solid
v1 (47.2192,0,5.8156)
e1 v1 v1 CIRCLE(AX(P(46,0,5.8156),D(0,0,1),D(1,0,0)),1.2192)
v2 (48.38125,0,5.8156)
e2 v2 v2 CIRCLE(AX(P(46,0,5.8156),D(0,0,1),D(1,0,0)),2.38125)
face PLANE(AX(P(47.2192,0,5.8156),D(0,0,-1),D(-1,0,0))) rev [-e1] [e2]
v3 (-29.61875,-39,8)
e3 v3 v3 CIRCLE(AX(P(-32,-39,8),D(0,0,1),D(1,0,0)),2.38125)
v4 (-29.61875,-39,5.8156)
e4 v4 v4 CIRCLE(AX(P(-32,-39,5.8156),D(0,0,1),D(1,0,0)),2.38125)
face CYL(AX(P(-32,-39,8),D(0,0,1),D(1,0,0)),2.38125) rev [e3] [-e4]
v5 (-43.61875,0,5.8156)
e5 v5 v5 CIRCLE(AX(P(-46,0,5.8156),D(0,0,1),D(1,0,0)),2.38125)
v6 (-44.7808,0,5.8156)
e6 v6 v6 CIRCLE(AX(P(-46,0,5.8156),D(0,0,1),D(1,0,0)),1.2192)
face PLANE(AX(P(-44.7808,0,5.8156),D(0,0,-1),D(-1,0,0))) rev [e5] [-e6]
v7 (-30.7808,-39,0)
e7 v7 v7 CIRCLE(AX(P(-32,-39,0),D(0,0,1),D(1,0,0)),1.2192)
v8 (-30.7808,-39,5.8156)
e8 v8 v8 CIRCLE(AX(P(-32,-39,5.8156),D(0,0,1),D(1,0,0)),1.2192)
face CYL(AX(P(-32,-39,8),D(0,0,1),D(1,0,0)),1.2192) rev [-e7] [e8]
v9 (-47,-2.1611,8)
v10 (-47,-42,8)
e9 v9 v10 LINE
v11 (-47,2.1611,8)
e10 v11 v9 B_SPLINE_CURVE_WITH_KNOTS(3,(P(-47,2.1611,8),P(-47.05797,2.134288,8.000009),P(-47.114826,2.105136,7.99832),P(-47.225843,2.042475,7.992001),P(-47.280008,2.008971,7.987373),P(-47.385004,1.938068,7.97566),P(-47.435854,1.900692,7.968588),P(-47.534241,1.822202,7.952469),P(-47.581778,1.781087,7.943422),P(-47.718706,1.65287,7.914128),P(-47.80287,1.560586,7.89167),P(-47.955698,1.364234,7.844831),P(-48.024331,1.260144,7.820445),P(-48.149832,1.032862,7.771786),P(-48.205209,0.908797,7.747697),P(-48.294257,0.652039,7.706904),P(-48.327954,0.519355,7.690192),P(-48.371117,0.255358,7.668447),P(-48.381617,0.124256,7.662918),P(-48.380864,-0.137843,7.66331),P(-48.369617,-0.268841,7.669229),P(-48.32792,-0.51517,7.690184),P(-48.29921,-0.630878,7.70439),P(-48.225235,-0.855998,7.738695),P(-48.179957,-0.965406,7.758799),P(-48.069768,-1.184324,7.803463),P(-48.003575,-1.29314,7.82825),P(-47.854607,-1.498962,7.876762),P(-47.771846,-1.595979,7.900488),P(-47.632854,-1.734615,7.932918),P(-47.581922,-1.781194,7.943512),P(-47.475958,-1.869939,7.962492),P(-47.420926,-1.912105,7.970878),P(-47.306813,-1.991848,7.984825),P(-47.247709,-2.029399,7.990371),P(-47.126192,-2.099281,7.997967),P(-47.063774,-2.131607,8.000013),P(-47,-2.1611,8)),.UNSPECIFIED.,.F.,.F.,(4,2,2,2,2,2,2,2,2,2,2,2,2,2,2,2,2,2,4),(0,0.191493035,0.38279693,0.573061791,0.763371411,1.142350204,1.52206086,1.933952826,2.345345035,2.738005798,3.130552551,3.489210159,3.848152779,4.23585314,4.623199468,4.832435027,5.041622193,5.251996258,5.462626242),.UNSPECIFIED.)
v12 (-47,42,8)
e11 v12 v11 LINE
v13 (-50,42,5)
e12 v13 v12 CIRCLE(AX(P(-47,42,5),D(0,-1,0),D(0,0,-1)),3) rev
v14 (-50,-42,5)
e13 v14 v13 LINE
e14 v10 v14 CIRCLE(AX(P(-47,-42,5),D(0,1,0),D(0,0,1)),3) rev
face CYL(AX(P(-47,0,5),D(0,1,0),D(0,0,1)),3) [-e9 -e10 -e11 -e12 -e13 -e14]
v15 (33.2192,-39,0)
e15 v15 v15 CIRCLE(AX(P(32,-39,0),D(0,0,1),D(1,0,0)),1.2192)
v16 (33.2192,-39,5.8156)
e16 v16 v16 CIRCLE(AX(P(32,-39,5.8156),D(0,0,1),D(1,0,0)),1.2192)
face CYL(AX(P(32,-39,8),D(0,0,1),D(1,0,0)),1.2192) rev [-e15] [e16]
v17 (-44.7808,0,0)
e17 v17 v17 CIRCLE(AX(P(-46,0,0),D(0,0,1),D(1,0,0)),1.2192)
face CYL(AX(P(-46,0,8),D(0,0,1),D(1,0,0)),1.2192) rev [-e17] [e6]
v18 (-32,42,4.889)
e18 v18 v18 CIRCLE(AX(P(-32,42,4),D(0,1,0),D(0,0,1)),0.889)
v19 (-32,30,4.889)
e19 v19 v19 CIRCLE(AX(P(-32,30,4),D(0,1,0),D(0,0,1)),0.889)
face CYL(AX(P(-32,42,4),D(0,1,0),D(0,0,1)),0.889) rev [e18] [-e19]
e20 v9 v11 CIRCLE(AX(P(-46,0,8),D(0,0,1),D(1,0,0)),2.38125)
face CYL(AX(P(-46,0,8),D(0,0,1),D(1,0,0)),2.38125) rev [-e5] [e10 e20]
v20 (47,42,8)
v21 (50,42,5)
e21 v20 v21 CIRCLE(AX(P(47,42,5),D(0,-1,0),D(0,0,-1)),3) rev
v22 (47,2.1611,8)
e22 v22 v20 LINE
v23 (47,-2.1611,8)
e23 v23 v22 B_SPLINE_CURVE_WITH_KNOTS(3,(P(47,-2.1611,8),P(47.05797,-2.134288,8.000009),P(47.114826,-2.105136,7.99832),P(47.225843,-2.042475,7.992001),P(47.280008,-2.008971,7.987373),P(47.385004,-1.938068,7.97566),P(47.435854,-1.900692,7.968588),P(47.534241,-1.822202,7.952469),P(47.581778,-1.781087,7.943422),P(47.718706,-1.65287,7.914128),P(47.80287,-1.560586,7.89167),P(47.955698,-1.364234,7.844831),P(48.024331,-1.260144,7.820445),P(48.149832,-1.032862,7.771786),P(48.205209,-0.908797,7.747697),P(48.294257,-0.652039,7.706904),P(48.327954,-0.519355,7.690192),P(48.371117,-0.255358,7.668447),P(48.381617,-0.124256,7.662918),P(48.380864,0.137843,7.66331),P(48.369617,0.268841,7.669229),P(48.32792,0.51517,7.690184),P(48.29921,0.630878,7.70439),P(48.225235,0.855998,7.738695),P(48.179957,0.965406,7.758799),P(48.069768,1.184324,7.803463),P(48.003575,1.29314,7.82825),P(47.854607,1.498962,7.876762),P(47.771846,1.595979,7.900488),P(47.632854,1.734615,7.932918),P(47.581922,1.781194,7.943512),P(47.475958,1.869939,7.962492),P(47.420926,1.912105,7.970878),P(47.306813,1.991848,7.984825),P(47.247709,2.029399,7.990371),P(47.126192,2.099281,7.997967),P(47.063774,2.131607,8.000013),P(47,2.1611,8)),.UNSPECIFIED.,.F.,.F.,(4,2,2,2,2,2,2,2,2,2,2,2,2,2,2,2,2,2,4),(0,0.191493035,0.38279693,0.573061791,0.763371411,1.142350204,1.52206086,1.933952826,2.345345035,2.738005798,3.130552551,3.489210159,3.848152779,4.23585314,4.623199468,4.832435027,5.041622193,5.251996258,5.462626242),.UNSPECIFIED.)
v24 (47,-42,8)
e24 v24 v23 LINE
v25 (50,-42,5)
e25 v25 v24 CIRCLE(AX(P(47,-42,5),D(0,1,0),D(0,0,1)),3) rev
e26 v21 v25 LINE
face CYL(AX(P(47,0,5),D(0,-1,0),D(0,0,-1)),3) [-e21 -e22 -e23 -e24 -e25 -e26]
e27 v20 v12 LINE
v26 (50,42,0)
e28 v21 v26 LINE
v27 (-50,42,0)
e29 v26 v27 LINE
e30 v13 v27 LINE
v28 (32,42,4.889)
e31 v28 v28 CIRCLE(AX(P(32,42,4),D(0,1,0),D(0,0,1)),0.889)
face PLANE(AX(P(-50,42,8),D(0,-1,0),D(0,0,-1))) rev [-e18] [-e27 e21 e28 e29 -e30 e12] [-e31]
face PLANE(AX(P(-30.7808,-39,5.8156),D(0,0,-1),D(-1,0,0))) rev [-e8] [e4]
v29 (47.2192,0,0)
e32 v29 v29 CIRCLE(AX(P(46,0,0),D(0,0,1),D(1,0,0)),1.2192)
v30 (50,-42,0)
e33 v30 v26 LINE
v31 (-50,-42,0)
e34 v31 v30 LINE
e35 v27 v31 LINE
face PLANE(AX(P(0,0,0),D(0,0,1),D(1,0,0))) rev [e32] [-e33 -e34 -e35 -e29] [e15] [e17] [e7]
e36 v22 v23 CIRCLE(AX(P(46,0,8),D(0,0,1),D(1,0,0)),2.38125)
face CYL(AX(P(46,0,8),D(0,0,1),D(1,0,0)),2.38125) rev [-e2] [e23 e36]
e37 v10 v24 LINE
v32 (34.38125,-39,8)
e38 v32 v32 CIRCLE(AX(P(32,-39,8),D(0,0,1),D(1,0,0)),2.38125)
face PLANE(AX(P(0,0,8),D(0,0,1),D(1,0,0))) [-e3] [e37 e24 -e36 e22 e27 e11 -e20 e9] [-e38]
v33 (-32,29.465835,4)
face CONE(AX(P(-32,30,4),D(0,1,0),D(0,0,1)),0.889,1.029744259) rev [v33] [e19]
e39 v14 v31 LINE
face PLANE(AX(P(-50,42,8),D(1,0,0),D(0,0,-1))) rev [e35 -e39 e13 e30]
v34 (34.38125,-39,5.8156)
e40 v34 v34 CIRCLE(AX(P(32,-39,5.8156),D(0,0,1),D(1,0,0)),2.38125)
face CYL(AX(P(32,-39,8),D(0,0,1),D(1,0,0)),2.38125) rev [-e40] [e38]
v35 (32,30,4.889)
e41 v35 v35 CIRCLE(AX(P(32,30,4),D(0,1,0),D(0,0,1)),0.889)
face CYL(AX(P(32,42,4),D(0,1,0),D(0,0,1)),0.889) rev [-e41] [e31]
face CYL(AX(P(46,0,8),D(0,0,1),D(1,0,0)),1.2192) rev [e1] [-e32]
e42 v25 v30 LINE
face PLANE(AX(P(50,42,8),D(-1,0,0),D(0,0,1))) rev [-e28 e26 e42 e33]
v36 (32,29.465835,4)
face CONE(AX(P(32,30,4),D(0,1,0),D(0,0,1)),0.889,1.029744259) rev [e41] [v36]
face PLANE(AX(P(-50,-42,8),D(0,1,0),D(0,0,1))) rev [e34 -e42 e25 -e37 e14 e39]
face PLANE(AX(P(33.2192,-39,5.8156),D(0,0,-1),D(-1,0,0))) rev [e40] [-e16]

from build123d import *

# Parameters (mm, degrees)
SKETCH1_W                                      = 100
SKETCH1_H                                      = 84
BOSS_EXTRUDE1_DEPTH                            = 8
CBORE_FOR_2_SOCKET_HEAD_CAP_SCREW1_D           = 2.4384
CBORE_FOR_2_SOCKET_HEAD_CAP_SCREW1_DEPTH       = 12.27
CBORE_FOR_2_SOCKET_HEAD_CAP_SCREW1_CBORE_D     = 4.7625
CBORE_FOR_2_SOCKET_HEAD_CAP_SCREW1_CBORE_DEPTH = 2.1844
CBORE_FOR_2_SOCKET_HEAD_CAP_SCREW1_TIP         = 0.732569267
CBORE_FOR_2_SOCKET_HEAD_CAP_SCREW2_D           = 2.4384
CBORE_FOR_2_SOCKET_HEAD_CAP_SCREW2_DEPTH       = 12.27
CBORE_FOR_2_SOCKET_HEAD_CAP_SCREW2_CBORE_D     = 4.7625
CBORE_FOR_2_SOCKET_HEAD_CAP_SCREW2_CBORE_DEPTH = 2.1844
CBORE_FOR_2_SOCKET_HEAD_CAP_SCREW2_TIP         = 0.732569267
F_2_56_TAPPED_HOLE1_D                          = 1.778
F_2_56_TAPPED_HOLE1_DEPTH                      = 12
F_2_56_TAPPED_HOLE1_TIP                        = 0.53416509
FILLET1_R                                      = 3


with BuildPart() as part:
    # Sketch1 → Boss-Extrude1 (new body)
    with BuildSketch(Plane.XY):
        Rectangle(SKETCH1_W, SKETCH1_H)
    extrude(amount=BOSS_EXTRUDE1_DEPTH)

    # CBORE for #2 Socket Head Cap Screw1
    with Locations(Plane(origin=(-32, -39, 8), x_dir=(1, 0, 0), z_dir=(0, 0, 1))):
        with Locations((0, 0), (64, 0)):
            CounterBoreHole(CBORE_FOR_2_SOCKET_HEAD_CAP_SCREW1_D / 2, CBORE_FOR_2_SOCKET_HEAD_CAP_SCREW1_CBORE_D / 2, CBORE_FOR_2_SOCKET_HEAD_CAP_SCREW1_CBORE_DEPTH, depth=CBORE_FOR_2_SOCKET_HEAD_CAP_SCREW1_DEPTH)
            with Locations((0, 0, -(CBORE_FOR_2_SOCKET_HEAD_CAP_SCREW1_DEPTH + CBORE_FOR_2_SOCKET_HEAD_CAP_SCREW1_TIP / 2))):  # 118° drill point
                Cone(0, CBORE_FOR_2_SOCKET_HEAD_CAP_SCREW1_D / 2, CBORE_FOR_2_SOCKET_HEAD_CAP_SCREW1_TIP, mode=Mode.SUBTRACT)

    # CBORE for #2 Socket Head Cap Screw2
    with Locations(Plane(origin=(-46, 0, 8), x_dir=(1, 0, 0), z_dir=(0, 0, 1))):
        with Locations((0, 0), (92, 0)):
            CounterBoreHole(CBORE_FOR_2_SOCKET_HEAD_CAP_SCREW2_D / 2, CBORE_FOR_2_SOCKET_HEAD_CAP_SCREW2_CBORE_D / 2, CBORE_FOR_2_SOCKET_HEAD_CAP_SCREW2_CBORE_DEPTH, depth=CBORE_FOR_2_SOCKET_HEAD_CAP_SCREW2_DEPTH)
            with Locations((0, 0, -(CBORE_FOR_2_SOCKET_HEAD_CAP_SCREW2_DEPTH + CBORE_FOR_2_SOCKET_HEAD_CAP_SCREW2_TIP / 2))):  # 118° drill point
                Cone(0, CBORE_FOR_2_SOCKET_HEAD_CAP_SCREW2_D / 2, CBORE_FOR_2_SOCKET_HEAD_CAP_SCREW2_TIP, mode=Mode.SUBTRACT)

    # #2-56 Tapped Hole1
    with Locations(Plane(origin=(-32, 42, 4), x_dir=(0, 0, 1), z_dir=(0, 1, 0))):
        with Locations((0, 0), (0, 64)):
            Hole(F_2_56_TAPPED_HOLE1_D / 2, depth=F_2_56_TAPPED_HOLE1_DEPTH)
            with Locations((0, 0, -(F_2_56_TAPPED_HOLE1_DEPTH + F_2_56_TAPPED_HOLE1_TIP / 2))):  # 118° drill point
                Cone(0, F_2_56_TAPPED_HOLE1_D / 2, F_2_56_TAPPED_HOLE1_TIP, mode=Mode.SUBTRACT)

    # Fillet1
    # the kernel refuses this fillet: 3 mm, written as the material it takes off along each edge
    with BuildSketch(Plane(origin=(-50, -49.5, 8), x_dir=(0, 0, -1), z_dir=(0, 1, 0))) as fillet1_piece_1:
        with BuildLine():
            CenterArc((FILLET1_R, -FILLET1_R), FILLET1_R, 90, 90)
            Line((0, -FILLET1_R), (0, 0))
            Line((0, 0), (FILLET1_R, 0))
        make_face()
    extrude(amount=99, mode=Mode.SUBTRACT)
    with BuildSketch(Plane(origin=(50, 49.5, 8), x_dir=(-1, 0, 0), z_dir=(0, -1, 0))) as fillet1_piece_2:
        with BuildLine():
            CenterArc((FILLET1_R, FILLET1_R), FILLET1_R, 180, 90)
            Line((0, FILLET1_R), (0, 0))
            Line((0, 0), (FILLET1_R, 0))
        make_face()
    extrude(amount=99, mode=Mode.SUBTRACT)


solid = part.part
